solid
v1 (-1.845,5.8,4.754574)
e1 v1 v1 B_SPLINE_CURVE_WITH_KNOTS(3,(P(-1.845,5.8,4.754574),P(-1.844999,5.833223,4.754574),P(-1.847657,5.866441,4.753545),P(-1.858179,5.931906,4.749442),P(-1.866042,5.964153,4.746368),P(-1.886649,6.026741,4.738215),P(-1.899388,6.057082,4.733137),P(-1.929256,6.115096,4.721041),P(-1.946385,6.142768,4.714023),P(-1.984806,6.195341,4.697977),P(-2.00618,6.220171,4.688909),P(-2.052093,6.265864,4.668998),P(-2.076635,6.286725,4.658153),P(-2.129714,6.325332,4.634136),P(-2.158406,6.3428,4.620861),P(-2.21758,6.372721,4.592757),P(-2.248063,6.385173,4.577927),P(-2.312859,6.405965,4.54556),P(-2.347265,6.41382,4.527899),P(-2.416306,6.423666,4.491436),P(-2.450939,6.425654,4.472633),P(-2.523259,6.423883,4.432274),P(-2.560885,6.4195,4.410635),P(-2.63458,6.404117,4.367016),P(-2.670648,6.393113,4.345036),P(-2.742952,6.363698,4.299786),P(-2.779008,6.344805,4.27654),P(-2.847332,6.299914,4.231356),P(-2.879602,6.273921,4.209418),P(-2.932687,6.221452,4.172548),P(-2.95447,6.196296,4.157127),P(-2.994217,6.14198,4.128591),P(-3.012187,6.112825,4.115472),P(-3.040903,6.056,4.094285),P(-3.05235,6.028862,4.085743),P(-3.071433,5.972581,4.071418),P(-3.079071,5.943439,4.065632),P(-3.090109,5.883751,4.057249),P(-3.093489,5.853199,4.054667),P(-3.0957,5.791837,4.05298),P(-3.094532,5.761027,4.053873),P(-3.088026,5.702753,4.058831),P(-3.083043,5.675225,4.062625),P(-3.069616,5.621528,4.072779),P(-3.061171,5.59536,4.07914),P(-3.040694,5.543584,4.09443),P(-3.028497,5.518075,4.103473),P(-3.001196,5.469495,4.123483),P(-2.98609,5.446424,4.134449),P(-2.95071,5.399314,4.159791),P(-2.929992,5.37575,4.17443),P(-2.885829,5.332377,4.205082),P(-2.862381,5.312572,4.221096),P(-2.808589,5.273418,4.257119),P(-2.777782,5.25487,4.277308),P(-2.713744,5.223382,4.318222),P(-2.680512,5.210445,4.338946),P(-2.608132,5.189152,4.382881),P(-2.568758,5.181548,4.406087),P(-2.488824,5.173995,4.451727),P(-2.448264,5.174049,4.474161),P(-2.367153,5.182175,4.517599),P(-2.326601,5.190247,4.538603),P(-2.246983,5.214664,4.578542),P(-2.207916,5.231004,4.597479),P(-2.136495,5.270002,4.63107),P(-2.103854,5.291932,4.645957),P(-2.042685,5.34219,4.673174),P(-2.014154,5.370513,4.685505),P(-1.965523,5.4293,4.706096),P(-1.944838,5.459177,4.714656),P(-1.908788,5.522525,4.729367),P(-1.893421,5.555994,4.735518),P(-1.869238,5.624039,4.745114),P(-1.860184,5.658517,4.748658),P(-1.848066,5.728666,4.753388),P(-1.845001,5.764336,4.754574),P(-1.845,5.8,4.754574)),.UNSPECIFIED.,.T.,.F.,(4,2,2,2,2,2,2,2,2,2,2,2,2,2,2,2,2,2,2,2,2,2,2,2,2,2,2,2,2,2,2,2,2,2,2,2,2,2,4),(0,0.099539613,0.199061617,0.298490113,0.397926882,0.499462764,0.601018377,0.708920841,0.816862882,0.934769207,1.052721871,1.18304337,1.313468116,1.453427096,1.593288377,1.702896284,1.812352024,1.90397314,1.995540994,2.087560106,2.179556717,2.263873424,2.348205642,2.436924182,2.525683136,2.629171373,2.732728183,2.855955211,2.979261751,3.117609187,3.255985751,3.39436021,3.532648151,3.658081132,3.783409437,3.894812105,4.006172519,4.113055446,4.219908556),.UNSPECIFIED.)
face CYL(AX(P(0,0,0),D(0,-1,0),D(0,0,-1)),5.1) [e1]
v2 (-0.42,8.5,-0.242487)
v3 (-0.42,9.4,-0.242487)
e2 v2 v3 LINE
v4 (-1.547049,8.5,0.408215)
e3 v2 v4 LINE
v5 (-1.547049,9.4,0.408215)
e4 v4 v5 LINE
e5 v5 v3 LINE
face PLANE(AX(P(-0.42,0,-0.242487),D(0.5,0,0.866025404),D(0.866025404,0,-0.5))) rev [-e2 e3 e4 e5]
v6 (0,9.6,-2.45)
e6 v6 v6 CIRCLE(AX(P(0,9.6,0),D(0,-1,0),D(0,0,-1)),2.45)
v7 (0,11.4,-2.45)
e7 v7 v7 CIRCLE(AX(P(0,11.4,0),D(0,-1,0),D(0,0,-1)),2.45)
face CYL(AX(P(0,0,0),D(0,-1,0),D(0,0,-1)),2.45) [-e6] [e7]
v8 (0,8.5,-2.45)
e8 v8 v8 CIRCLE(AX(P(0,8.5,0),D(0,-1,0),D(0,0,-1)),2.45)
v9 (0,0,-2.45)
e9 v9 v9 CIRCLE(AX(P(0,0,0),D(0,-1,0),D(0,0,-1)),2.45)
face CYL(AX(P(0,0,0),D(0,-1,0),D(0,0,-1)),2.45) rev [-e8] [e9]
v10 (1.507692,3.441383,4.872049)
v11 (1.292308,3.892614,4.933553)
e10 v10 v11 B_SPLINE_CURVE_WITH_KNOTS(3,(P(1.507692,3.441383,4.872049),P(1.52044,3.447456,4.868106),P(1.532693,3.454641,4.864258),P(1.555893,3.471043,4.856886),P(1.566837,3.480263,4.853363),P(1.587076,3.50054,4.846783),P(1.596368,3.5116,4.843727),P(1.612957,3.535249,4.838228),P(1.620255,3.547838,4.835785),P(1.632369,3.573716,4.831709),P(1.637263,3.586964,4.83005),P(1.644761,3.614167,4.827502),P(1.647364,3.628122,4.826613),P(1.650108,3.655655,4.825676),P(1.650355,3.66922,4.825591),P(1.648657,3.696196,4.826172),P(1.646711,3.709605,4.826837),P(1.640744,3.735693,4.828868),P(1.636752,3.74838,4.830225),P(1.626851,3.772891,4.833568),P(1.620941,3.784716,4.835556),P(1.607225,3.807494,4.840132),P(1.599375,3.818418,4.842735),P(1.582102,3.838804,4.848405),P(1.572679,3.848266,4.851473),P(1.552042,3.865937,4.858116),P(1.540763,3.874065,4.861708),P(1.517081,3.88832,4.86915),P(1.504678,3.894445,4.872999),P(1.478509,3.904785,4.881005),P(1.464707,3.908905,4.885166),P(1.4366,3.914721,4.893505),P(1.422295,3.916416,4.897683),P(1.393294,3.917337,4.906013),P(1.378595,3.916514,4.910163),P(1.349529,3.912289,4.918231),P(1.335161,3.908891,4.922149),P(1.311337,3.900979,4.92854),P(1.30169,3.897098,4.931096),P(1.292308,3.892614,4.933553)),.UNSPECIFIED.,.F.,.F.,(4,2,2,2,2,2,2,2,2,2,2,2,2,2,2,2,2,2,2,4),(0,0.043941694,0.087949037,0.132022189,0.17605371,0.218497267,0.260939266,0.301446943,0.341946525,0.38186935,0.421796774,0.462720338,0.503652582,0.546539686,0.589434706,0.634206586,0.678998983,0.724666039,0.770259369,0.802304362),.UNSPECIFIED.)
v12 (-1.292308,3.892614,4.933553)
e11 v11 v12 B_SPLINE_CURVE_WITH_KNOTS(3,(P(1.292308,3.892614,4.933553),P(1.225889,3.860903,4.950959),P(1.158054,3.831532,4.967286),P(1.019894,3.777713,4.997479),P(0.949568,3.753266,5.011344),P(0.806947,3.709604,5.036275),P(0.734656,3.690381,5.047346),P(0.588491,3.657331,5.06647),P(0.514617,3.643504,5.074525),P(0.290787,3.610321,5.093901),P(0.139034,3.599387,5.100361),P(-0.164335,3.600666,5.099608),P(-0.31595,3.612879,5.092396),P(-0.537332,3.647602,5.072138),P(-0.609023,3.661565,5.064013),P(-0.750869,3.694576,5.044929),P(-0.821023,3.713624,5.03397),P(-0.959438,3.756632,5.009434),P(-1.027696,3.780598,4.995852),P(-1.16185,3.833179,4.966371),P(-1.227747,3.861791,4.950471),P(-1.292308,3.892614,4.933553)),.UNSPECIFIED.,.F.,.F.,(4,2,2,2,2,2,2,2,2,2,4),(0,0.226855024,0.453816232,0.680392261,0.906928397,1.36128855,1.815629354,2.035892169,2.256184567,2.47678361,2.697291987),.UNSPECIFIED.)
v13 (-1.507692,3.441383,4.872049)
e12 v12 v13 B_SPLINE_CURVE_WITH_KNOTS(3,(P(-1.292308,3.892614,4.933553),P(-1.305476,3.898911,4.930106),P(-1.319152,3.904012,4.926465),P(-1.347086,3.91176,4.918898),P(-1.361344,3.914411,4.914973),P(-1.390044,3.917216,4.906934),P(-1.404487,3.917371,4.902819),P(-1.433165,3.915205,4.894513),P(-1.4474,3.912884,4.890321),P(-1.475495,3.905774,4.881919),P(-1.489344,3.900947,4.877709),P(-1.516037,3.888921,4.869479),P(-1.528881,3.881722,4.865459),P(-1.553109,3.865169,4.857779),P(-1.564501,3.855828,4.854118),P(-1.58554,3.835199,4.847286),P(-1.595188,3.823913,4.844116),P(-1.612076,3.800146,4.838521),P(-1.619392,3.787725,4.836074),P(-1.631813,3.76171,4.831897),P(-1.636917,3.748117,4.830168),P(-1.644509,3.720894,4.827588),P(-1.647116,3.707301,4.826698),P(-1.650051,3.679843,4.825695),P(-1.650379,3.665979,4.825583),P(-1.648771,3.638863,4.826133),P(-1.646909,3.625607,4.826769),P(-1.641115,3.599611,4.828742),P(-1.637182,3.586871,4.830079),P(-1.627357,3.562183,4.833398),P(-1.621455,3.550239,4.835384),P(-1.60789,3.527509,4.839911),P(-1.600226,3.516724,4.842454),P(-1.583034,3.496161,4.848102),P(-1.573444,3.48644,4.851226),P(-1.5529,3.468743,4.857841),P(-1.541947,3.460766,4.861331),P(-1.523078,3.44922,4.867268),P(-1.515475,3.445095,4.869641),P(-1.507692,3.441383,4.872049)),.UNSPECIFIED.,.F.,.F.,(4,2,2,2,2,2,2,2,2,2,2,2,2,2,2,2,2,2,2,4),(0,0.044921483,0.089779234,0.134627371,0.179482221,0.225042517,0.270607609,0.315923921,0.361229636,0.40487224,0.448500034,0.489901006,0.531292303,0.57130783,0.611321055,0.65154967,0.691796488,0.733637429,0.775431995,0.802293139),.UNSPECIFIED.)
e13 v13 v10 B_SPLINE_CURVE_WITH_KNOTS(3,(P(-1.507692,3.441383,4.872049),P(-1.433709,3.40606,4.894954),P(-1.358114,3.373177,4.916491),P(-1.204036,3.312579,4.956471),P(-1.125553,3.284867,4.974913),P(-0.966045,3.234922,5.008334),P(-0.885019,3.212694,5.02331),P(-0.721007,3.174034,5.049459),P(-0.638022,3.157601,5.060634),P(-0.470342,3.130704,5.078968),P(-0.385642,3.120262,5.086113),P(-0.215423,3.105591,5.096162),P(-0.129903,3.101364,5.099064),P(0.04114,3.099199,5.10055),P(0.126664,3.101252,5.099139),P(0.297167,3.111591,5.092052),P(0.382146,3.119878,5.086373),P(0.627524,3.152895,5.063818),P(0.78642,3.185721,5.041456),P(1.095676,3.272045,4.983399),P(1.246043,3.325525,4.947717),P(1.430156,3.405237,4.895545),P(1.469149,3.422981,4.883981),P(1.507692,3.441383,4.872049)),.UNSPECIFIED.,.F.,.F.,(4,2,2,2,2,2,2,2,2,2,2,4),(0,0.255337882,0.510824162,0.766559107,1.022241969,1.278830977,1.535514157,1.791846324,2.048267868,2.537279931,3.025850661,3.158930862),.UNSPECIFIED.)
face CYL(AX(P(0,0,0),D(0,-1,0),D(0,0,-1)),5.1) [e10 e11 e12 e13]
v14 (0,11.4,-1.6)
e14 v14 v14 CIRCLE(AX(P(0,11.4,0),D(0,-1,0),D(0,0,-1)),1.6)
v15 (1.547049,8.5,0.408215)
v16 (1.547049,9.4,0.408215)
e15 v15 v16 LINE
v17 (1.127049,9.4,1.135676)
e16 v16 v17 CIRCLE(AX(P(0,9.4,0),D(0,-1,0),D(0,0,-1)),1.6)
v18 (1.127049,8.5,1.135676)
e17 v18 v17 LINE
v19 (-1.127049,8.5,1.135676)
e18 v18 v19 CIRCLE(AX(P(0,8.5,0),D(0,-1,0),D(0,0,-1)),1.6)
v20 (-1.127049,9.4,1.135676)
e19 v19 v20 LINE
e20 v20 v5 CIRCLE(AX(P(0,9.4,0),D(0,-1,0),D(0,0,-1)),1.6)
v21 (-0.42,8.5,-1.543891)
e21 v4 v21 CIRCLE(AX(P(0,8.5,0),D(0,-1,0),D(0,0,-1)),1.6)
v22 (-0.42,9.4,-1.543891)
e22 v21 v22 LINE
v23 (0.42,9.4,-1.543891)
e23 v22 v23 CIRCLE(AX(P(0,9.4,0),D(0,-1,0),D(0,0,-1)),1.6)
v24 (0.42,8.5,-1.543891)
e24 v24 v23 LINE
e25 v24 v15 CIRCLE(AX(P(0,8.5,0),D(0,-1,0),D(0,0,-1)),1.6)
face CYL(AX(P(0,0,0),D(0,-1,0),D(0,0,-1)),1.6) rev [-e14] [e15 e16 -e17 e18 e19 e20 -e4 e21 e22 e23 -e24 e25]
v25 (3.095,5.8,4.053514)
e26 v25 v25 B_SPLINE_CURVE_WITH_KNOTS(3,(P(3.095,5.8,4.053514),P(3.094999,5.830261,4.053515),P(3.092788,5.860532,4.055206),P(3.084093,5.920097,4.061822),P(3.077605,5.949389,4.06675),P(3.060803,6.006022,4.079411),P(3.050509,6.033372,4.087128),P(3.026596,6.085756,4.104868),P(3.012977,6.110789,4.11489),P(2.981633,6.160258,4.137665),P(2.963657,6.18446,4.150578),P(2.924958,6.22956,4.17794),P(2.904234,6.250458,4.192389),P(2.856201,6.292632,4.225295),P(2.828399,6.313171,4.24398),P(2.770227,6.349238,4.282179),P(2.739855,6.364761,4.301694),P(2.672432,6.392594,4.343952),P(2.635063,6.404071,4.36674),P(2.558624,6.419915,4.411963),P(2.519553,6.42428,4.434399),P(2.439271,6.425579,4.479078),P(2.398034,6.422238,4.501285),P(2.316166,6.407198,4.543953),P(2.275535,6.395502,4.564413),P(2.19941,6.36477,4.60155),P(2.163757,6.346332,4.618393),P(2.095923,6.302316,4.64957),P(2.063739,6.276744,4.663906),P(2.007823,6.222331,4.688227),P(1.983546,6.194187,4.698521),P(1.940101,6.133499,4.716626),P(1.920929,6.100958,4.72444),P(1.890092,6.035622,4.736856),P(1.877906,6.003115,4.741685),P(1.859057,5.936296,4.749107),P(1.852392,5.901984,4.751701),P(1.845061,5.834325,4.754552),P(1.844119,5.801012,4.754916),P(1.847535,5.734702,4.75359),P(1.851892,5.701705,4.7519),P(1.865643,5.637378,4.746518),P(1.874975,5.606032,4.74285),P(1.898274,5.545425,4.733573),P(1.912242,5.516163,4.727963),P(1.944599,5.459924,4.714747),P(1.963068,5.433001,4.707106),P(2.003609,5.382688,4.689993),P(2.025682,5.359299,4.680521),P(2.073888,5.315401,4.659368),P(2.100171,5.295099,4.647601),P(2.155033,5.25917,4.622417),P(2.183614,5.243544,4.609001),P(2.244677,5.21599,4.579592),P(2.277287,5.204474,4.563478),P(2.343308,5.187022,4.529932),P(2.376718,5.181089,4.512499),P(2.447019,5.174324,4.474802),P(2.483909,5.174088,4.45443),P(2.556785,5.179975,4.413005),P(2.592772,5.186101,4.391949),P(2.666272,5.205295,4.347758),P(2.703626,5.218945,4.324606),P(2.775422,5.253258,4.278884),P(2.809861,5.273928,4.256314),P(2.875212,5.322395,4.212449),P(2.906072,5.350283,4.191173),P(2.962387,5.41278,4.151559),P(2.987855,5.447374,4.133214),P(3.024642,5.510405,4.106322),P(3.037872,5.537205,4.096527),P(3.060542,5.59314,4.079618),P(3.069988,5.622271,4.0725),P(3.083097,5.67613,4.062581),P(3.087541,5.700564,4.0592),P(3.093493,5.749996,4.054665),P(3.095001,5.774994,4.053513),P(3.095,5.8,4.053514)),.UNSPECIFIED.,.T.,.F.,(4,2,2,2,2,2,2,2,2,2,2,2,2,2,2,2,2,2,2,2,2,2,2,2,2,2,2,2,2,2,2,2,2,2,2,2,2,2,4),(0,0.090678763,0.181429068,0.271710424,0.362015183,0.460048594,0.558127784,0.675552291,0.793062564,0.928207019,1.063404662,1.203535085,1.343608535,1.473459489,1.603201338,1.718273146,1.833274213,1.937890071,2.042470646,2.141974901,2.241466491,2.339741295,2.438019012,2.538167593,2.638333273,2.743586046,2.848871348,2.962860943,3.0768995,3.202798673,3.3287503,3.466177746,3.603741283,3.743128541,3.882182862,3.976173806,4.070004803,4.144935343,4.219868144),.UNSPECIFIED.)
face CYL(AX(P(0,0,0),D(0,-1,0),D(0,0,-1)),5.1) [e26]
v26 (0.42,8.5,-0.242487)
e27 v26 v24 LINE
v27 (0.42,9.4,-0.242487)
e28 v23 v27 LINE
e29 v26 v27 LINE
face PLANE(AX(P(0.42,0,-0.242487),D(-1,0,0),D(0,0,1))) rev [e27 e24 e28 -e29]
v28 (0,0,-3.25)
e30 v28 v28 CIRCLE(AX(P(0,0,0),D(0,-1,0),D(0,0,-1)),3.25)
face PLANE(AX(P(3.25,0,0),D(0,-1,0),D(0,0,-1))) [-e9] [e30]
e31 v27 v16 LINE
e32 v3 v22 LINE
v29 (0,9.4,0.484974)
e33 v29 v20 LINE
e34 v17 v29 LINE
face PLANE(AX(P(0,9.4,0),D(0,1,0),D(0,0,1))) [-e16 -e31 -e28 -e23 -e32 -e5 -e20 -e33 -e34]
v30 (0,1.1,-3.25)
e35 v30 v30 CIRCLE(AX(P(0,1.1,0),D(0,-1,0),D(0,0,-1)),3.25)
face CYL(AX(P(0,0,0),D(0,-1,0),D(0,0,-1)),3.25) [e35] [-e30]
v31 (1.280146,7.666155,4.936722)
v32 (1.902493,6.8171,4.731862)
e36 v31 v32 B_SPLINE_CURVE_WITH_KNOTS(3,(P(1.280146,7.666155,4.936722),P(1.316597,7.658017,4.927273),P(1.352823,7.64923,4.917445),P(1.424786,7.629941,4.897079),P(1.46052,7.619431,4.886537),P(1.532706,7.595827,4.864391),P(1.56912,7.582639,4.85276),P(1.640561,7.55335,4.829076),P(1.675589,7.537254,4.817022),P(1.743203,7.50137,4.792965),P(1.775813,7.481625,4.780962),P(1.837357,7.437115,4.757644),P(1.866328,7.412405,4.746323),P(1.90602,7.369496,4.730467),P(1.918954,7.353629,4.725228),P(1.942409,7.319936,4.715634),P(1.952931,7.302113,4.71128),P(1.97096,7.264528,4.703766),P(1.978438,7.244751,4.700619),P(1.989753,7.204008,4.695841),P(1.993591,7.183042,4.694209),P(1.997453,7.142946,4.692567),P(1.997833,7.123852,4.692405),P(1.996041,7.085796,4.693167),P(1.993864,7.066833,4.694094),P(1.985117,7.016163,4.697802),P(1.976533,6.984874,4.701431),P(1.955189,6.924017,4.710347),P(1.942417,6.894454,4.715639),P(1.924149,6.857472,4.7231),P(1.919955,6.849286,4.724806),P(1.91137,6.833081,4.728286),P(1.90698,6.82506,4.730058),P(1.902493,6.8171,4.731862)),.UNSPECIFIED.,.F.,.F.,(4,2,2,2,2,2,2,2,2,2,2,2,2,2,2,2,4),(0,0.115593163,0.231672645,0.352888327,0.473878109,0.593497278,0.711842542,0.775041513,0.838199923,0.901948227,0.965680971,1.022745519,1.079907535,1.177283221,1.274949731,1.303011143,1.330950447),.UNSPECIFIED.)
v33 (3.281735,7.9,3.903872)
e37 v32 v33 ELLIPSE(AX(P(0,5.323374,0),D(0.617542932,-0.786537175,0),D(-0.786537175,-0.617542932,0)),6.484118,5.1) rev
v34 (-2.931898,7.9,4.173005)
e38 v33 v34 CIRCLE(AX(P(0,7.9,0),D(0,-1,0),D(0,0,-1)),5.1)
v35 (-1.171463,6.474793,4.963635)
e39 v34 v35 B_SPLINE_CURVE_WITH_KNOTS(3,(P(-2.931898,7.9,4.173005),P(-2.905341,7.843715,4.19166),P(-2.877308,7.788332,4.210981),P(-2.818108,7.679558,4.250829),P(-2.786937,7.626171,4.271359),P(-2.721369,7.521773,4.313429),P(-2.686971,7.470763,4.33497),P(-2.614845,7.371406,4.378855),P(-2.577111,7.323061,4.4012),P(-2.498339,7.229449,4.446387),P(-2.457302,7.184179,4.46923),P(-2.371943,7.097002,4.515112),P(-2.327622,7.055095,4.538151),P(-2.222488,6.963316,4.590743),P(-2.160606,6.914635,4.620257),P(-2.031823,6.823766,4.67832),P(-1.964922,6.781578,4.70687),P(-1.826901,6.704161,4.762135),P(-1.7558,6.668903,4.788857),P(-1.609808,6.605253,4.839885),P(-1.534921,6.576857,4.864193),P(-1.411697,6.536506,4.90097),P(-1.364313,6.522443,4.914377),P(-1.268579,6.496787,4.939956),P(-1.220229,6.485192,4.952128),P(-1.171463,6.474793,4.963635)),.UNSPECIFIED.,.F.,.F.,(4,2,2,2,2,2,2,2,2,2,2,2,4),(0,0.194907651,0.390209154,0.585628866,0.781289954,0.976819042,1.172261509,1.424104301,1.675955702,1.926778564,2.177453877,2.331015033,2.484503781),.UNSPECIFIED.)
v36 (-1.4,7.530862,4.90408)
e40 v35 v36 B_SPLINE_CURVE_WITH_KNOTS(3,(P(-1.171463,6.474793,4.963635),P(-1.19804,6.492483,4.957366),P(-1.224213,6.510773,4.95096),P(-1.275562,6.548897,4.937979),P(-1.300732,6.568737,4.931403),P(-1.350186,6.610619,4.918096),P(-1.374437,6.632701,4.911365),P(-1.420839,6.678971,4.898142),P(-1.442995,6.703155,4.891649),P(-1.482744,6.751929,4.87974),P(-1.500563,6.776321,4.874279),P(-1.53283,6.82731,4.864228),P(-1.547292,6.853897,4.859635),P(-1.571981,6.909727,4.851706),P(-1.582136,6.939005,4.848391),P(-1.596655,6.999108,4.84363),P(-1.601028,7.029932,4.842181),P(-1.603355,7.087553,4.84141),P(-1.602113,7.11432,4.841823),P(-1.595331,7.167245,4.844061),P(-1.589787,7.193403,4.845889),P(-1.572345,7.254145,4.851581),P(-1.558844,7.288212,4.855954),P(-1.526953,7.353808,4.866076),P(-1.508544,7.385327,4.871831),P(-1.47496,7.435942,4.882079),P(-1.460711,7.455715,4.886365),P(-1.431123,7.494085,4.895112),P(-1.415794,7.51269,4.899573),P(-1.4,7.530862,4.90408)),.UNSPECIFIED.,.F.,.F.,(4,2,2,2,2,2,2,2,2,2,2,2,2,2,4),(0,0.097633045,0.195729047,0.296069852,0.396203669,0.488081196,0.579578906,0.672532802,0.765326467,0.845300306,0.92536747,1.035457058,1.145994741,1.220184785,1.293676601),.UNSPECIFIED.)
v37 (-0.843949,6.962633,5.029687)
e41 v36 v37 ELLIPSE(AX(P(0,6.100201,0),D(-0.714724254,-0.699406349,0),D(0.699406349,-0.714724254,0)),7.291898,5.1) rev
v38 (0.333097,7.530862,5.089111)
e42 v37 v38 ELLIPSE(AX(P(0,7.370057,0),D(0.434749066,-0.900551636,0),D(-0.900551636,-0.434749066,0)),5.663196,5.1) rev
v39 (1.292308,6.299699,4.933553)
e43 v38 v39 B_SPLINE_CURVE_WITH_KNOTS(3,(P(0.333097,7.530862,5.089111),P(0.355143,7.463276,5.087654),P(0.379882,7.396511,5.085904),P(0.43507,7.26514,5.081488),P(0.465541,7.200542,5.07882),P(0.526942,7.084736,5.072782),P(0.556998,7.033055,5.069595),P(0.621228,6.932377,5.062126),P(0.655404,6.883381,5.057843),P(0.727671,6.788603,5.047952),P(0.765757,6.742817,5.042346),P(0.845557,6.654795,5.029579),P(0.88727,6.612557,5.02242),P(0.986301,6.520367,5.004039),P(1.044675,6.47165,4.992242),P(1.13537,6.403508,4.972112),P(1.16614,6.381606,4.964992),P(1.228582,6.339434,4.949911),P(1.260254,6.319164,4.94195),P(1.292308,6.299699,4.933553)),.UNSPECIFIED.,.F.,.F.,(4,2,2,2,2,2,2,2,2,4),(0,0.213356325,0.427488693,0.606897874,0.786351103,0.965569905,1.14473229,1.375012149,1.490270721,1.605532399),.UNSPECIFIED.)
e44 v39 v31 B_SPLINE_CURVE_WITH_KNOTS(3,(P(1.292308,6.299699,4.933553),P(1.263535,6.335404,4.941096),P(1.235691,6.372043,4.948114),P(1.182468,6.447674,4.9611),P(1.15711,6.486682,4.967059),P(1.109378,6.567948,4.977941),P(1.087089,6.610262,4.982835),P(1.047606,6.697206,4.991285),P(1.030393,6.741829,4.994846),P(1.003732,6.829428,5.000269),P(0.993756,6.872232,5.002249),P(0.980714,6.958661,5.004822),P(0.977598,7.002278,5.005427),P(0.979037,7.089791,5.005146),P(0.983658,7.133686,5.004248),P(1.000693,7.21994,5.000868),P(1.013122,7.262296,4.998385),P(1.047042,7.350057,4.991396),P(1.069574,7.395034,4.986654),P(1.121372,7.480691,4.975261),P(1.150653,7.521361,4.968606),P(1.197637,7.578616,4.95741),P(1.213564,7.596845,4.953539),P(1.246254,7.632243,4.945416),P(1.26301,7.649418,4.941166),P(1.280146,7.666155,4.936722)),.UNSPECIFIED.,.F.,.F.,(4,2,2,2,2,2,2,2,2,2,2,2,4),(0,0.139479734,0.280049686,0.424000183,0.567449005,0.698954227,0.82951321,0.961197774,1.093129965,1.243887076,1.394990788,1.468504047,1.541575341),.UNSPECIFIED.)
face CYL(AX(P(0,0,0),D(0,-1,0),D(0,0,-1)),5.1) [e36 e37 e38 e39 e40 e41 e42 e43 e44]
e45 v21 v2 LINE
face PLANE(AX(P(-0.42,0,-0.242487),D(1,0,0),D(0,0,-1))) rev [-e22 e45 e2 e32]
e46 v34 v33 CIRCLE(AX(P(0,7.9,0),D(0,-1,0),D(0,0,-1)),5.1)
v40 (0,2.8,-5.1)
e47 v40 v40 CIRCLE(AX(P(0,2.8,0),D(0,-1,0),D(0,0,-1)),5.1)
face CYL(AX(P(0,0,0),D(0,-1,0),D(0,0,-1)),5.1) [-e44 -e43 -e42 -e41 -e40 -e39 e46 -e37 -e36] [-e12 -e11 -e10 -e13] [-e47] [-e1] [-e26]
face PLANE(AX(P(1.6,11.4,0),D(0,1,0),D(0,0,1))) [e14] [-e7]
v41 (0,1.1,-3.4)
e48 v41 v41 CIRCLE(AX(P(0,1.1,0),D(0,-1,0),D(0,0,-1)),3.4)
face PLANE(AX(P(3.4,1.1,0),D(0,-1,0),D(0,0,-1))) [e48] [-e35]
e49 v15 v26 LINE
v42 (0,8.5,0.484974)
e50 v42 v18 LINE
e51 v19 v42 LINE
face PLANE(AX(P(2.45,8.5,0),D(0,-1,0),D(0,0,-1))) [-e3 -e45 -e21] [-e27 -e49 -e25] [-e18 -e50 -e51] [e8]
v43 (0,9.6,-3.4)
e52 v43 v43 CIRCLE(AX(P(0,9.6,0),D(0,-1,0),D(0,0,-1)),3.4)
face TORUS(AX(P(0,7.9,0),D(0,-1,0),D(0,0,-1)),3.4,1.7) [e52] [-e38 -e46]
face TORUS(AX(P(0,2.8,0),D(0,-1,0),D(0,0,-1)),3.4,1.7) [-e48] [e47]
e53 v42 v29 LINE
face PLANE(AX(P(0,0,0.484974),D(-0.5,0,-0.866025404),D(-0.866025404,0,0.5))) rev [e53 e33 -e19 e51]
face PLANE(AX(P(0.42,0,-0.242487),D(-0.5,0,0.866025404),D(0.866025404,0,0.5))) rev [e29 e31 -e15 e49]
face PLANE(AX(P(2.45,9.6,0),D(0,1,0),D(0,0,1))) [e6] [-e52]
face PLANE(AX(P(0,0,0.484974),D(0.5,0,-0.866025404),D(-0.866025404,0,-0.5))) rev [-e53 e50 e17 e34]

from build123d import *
from build123d.topology import SkipClean

# Parameters (mm, degrees)
CUT_EXTRUDE1_DEPTH = 12.848206658
CIRPATTERN1_COUNT  = 3


with BuildPart() as part:
    # Sketch1 → Revolve1 (revolve)
    with BuildSketch(Plane.XY):
        with BuildLine():
            Line((0, 9.4), (1.6, 9.4))
            Line((1.6, 9.4), (1.6, 11.4))
            Line((1.6, 11.4), (2.45, 11.4))
            Line((2.45, 11.4), (2.45, 9.6))
            Line((2.45, 9.6), (3.4, 9.6))
            ThreePointArc((3.4, 9.6), (4.602081528, 9.102081528), (5.1, 7.9))
            Line((5.1, 7.9), (5.1, 2.8))
            ThreePointArc((5.1, 2.8), (4.602081528, 1.597918472), (3.4, 1.1))
            Line((3.4, 1.1), (3.25, 1.1))
            Line((3.25, 1.1), (3.25, 0))
            Line((3.25, 0), (2.45, 0))
            Line((2.45, 0), (2.45, 8.5))
            Line((2.45, 8.5), (0, 8.5))
            Line((0, 8.5), (0, 9.4))
        make_face()
    revolve(axis=Axis((0, 0, 0), (0, 1, 0)))

    # Sketch3 → Cut-Extrude1 (cut, through all)
    with SkipClean():  # the faces are left unmerged after this step: merging them gives an invalid solid
        with BuildSketch(Plane(origin=(0, 9.4, 0), x_dir=(1, 0, 0), z_dir=(0, 1, 0))):
            with BuildLine():
                Line((-0.42, 0.242487113), (-1.547048989, -0.408214924))
                ThreePointArc((-1.547048989, -0.408214924), (-1.385640646, 0.8), (-0.42, 1.543891188))
                Line((-0.42, 1.543891188), (-0.42, 0.242487113))
            make_face()
        cut_extrude1 = extrude(amount=-CUT_EXTRUDE1_DEPTH, mode=Mode.SUBTRACT)

    # CirPattern1: Cut-Extrude1 ×3 about axis
    with SkipClean():  # the faces are left unmerged after this step: merging them gives an invalid solid
        cirpattern1_axis = Axis((0, 0, 0), (0, -1, 0))
        for i in range(1, CIRPATTERN1_COUNT):
            add(cut_extrude1.rotate(cirpattern1_axis, i * 360 / CIRPATTERN1_COUNT), mode=Mode.SUBTRACT)


solid = part.part
